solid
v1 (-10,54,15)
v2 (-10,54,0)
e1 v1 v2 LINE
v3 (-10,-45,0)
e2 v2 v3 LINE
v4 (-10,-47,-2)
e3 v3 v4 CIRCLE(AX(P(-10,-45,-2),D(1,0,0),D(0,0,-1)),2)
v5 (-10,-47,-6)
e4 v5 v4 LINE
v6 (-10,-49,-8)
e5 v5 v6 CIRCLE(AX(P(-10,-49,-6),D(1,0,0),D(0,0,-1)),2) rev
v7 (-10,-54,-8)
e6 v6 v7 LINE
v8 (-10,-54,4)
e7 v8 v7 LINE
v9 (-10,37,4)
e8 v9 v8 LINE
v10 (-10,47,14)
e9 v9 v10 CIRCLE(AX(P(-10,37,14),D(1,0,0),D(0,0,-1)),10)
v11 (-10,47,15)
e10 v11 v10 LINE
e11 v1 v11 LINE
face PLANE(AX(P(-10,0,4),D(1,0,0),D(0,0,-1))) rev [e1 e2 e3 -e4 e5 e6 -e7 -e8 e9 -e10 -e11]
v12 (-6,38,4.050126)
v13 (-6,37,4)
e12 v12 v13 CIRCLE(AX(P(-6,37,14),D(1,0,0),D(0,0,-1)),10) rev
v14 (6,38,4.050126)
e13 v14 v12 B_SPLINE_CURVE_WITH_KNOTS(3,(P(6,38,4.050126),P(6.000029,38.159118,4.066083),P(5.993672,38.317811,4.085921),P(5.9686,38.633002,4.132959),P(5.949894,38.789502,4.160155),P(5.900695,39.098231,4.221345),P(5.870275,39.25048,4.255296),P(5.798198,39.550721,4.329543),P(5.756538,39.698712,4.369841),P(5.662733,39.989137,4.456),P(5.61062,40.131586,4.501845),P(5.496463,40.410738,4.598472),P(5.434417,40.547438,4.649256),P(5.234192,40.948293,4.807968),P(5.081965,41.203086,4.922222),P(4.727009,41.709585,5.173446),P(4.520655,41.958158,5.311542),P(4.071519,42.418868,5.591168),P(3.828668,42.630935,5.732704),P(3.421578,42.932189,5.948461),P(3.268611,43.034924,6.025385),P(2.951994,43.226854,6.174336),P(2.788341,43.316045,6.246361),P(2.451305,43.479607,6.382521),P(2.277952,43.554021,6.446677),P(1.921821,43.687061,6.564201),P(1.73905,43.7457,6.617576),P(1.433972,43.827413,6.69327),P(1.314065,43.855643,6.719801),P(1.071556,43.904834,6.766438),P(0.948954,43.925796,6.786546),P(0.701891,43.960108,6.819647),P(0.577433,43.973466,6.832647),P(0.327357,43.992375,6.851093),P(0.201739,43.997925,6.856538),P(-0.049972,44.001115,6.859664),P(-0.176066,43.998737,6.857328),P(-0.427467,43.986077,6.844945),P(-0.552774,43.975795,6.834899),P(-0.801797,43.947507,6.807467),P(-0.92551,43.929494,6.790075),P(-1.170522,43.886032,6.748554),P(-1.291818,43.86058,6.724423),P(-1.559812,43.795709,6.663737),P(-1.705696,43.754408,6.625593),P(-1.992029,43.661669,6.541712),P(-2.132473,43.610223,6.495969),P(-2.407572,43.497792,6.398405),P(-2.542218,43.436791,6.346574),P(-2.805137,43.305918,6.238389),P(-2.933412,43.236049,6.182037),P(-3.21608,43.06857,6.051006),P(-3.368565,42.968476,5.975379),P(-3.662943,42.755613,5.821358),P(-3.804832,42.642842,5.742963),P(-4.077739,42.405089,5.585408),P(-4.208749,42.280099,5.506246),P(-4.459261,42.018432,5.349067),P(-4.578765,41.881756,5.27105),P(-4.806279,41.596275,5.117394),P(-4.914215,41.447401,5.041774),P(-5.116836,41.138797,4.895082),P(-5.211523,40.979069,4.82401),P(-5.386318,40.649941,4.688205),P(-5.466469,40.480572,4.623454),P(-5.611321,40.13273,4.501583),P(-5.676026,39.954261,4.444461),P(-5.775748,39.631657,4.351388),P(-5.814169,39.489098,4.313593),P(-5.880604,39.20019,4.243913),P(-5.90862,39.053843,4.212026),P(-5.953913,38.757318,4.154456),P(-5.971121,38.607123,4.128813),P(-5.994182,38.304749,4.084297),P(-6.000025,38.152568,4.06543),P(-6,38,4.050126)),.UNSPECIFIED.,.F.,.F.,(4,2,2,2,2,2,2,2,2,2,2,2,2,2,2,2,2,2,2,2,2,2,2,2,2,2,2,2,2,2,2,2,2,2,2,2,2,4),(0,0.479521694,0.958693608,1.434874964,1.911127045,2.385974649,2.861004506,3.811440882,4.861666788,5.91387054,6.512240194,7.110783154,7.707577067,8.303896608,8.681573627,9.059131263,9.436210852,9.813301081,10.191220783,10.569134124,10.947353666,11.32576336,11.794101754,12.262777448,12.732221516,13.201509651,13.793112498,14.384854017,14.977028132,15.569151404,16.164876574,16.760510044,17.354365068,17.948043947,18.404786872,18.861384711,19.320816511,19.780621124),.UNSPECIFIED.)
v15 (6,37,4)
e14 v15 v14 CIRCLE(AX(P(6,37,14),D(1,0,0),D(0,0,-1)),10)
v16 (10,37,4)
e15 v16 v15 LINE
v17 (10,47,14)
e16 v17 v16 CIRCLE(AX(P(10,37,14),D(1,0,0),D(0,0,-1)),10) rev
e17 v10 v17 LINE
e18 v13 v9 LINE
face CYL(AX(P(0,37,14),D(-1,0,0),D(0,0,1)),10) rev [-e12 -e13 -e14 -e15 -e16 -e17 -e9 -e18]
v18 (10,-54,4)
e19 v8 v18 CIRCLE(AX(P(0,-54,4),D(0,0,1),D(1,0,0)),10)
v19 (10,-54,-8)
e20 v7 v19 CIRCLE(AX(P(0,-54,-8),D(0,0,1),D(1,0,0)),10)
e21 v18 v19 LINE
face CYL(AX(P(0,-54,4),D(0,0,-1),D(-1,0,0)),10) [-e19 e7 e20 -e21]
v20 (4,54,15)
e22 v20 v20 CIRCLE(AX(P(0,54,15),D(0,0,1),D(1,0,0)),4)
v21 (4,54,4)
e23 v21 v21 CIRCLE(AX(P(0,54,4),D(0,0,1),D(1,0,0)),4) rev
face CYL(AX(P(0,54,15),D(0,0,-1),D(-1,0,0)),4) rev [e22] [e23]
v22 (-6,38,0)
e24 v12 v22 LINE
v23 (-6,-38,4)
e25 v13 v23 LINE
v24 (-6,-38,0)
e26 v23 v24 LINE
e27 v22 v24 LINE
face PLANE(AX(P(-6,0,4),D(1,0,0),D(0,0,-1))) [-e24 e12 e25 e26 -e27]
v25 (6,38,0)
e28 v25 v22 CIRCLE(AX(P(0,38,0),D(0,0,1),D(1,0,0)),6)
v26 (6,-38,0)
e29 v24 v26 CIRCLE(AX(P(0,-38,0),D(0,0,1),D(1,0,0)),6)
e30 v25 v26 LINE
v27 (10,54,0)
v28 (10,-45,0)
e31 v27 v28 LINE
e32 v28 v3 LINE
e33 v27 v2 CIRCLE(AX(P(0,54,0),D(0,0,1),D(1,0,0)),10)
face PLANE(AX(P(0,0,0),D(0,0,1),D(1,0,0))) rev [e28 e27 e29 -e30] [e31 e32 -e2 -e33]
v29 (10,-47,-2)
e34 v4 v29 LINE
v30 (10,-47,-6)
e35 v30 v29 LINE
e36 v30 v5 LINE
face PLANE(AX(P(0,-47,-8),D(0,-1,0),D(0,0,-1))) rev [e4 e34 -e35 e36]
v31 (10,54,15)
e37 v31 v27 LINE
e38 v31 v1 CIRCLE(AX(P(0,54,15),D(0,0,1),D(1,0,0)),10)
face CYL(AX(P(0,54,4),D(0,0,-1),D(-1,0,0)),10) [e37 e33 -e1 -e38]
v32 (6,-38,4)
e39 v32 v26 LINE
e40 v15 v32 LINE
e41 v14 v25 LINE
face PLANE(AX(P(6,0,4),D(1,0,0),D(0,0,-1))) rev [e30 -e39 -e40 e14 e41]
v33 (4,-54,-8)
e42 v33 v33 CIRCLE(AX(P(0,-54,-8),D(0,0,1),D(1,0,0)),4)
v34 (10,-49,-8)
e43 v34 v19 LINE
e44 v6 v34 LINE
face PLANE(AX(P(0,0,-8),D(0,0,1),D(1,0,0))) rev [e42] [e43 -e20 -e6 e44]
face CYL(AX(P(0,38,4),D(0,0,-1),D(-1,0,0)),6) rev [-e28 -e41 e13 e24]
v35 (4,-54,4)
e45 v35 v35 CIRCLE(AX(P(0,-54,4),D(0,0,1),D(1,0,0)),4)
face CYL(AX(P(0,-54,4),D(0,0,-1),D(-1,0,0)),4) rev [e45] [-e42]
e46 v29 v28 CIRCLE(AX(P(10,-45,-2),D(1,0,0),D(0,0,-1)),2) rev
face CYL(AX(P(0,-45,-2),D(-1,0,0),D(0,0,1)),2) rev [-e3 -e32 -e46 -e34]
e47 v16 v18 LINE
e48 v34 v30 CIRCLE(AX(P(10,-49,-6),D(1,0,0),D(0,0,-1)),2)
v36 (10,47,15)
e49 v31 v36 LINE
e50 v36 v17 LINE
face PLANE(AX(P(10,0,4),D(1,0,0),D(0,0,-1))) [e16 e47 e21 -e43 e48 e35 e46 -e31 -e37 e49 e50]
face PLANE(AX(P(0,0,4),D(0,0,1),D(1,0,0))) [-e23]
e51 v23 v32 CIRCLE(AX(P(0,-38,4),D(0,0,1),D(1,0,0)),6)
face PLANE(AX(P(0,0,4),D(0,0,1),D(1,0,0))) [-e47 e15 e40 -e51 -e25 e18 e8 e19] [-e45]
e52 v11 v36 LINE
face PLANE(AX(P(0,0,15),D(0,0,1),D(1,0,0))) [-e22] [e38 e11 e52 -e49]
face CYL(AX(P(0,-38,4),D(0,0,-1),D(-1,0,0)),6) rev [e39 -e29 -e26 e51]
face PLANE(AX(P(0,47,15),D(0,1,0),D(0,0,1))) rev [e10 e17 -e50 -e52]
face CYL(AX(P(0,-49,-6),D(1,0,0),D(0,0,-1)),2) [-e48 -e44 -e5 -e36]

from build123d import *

# Parameters (mm, degrees)
CROQUIS1_R              = 4
SALIENTE_EXTRUIR1_DEPTH = 4
SALIENTE_EXTRUIR2_START = -8
CROQUIS1_5_R            = 4
SALIENTE_EXTRUIR2_DEPTH = 8
REDONDEO2_R             = 2
CROQUIS1_6_R            = 4
SALIENTE_EXTRUIR3_DEPTH = 15
REDONDEO1_START         = -10
REDONDEO1_DEPTH         = 4
REDONDEO1_START_2       = 6
REDONDEO1_2_DEPTH       = 4
REDONDEO1_START_3       = 4
REDONDEO1_3_DEPTH       = 10
REDONDEO1_START_4       = -6
REDONDEO1_4_DEPTH       = 12


with BuildPart() as part:
    # Croquis1 → Saliente-Extruir1 (new body)
    with BuildSketch(Plane.XY):
        with BuildLine():
            Line((10, 54), (10, -54))
            ThreePointArc((10, -54), (0, -64), (-10, -54))
            Line((-10, -54), (-10, 54))
            ThreePointArc((-10, 54), (0, 64), (10, 54))
        make_face()
        with Locations((0, -54)):
            Circle(CROQUIS1_R, mode=Mode.SUBTRACT)
        with BuildLine():
            Line((6, 38), (6, -38))
            ThreePointArc((6, -38), (0, -44), (-6, -38))
            Line((-6, -38), (-6, 38))
            ThreePointArc((-6, 38), (0, 44), (6, 38))
        make_face(mode=Mode.SUBTRACT)
    extrude(amount=SALIENTE_EXTRUIR1_DEPTH)

    # Croquis1<5> → Saliente-Extruir2 (add)
    with BuildSketch(Plane.XY.offset(SALIENTE_EXTRUIR2_START)):
        with BuildLine():
            Line((10, -54), (10, -47))
            Line((10, -47), (-10, -47))
            Line((-10, -47), (-10, -54))
            ThreePointArc((-10, -54), (0, -64), (10, -54))
        make_face()
        with Locations((0, -54)):
            Circle(CROQUIS1_5_R, mode=Mode.SUBTRACT)
    extrude(amount=SALIENTE_EXTRUIR2_DEPTH)

    # Redondeo2
    redondeo2_edges = [part.edges().sort_by_distance(p)[0] for p in [
        (0, -47, 0),
        (0, -47, -8),
    ]]
    fillet(redondeo2_edges, radius=REDONDEO2_R)

    # Croquis1<6> → Saliente-Extruir3 (add)
    with BuildSketch(Plane.XY):
        with BuildLine():
            Line((10, 47), (10, 54))
            ThreePointArc((10, 54), (0, 64), (-10, 54))
            Line((-10, 54), (-10, 47))
            Line((-10, 47), (10, 47))
        make_face()
        with Locations((0, 54)):
            Circle(CROQUIS1_6_R, mode=Mode.SUBTRACT)
    extrude(amount=SALIENTE_EXTRUIR3_DEPTH)

    # Redondeo1: read off the stored shape, not the designer's step
    # Redondeo1 outline → Redondeo1 (add)
    with BuildSketch(Plane.YZ.offset(REDONDEO1_START)):
        with BuildLine():
            Line((47, 4), (47, 14))
            ThreePointArc((47, 14), (44.071067812, 6.928932188), (37, 4))
            Line((37, 4), (47, 4))
        make_face()
    extrude(amount=REDONDEO1_DEPTH)

    # Redondeo1 2 outline → Redondeo1 2 (add)
    with BuildSketch(Plane.YZ.offset(REDONDEO1_START_2)):
        with BuildLine():
            Line((47, 4), (47, 14))
            ThreePointArc((47, 14), (44.071067812, 6.928932188), (37, 4))
            Line((37, 4), (47, 4))
        make_face()
    extrude(amount=REDONDEO1_2_DEPTH)

    # Redondeo1 3 outline → Redondeo1 3 (add)
    with BuildSketch(Plane.XY.offset(REDONDEO1_START_3)):
        with BuildLine():
            Line((-6, 47), (-6, 38))
            ThreePointArc((-6, 38), (0, 44), (6, 38))
            Line((6, 38), (6, 47))
            Line((6, 47), (-6, 47))
        make_face()
    extrude(amount=REDONDEO1_3_DEPTH)

    # Redondeo1 4 outline → Redondeo1 4 (cut)
    with BuildSketch(Plane.YZ.offset(REDONDEO1_START_4)):
        with BuildLine():
            ThreePointArc((37, 4), (44.071067812, 6.928932188), (47, 14))
            Line((47, 14), (37, 14))
            Line((37, 14), (37, 4))
        make_face()
    extrude(amount=REDONDEO1_4_DEPTH, mode=Mode.SUBTRACT)


solid = part.part
